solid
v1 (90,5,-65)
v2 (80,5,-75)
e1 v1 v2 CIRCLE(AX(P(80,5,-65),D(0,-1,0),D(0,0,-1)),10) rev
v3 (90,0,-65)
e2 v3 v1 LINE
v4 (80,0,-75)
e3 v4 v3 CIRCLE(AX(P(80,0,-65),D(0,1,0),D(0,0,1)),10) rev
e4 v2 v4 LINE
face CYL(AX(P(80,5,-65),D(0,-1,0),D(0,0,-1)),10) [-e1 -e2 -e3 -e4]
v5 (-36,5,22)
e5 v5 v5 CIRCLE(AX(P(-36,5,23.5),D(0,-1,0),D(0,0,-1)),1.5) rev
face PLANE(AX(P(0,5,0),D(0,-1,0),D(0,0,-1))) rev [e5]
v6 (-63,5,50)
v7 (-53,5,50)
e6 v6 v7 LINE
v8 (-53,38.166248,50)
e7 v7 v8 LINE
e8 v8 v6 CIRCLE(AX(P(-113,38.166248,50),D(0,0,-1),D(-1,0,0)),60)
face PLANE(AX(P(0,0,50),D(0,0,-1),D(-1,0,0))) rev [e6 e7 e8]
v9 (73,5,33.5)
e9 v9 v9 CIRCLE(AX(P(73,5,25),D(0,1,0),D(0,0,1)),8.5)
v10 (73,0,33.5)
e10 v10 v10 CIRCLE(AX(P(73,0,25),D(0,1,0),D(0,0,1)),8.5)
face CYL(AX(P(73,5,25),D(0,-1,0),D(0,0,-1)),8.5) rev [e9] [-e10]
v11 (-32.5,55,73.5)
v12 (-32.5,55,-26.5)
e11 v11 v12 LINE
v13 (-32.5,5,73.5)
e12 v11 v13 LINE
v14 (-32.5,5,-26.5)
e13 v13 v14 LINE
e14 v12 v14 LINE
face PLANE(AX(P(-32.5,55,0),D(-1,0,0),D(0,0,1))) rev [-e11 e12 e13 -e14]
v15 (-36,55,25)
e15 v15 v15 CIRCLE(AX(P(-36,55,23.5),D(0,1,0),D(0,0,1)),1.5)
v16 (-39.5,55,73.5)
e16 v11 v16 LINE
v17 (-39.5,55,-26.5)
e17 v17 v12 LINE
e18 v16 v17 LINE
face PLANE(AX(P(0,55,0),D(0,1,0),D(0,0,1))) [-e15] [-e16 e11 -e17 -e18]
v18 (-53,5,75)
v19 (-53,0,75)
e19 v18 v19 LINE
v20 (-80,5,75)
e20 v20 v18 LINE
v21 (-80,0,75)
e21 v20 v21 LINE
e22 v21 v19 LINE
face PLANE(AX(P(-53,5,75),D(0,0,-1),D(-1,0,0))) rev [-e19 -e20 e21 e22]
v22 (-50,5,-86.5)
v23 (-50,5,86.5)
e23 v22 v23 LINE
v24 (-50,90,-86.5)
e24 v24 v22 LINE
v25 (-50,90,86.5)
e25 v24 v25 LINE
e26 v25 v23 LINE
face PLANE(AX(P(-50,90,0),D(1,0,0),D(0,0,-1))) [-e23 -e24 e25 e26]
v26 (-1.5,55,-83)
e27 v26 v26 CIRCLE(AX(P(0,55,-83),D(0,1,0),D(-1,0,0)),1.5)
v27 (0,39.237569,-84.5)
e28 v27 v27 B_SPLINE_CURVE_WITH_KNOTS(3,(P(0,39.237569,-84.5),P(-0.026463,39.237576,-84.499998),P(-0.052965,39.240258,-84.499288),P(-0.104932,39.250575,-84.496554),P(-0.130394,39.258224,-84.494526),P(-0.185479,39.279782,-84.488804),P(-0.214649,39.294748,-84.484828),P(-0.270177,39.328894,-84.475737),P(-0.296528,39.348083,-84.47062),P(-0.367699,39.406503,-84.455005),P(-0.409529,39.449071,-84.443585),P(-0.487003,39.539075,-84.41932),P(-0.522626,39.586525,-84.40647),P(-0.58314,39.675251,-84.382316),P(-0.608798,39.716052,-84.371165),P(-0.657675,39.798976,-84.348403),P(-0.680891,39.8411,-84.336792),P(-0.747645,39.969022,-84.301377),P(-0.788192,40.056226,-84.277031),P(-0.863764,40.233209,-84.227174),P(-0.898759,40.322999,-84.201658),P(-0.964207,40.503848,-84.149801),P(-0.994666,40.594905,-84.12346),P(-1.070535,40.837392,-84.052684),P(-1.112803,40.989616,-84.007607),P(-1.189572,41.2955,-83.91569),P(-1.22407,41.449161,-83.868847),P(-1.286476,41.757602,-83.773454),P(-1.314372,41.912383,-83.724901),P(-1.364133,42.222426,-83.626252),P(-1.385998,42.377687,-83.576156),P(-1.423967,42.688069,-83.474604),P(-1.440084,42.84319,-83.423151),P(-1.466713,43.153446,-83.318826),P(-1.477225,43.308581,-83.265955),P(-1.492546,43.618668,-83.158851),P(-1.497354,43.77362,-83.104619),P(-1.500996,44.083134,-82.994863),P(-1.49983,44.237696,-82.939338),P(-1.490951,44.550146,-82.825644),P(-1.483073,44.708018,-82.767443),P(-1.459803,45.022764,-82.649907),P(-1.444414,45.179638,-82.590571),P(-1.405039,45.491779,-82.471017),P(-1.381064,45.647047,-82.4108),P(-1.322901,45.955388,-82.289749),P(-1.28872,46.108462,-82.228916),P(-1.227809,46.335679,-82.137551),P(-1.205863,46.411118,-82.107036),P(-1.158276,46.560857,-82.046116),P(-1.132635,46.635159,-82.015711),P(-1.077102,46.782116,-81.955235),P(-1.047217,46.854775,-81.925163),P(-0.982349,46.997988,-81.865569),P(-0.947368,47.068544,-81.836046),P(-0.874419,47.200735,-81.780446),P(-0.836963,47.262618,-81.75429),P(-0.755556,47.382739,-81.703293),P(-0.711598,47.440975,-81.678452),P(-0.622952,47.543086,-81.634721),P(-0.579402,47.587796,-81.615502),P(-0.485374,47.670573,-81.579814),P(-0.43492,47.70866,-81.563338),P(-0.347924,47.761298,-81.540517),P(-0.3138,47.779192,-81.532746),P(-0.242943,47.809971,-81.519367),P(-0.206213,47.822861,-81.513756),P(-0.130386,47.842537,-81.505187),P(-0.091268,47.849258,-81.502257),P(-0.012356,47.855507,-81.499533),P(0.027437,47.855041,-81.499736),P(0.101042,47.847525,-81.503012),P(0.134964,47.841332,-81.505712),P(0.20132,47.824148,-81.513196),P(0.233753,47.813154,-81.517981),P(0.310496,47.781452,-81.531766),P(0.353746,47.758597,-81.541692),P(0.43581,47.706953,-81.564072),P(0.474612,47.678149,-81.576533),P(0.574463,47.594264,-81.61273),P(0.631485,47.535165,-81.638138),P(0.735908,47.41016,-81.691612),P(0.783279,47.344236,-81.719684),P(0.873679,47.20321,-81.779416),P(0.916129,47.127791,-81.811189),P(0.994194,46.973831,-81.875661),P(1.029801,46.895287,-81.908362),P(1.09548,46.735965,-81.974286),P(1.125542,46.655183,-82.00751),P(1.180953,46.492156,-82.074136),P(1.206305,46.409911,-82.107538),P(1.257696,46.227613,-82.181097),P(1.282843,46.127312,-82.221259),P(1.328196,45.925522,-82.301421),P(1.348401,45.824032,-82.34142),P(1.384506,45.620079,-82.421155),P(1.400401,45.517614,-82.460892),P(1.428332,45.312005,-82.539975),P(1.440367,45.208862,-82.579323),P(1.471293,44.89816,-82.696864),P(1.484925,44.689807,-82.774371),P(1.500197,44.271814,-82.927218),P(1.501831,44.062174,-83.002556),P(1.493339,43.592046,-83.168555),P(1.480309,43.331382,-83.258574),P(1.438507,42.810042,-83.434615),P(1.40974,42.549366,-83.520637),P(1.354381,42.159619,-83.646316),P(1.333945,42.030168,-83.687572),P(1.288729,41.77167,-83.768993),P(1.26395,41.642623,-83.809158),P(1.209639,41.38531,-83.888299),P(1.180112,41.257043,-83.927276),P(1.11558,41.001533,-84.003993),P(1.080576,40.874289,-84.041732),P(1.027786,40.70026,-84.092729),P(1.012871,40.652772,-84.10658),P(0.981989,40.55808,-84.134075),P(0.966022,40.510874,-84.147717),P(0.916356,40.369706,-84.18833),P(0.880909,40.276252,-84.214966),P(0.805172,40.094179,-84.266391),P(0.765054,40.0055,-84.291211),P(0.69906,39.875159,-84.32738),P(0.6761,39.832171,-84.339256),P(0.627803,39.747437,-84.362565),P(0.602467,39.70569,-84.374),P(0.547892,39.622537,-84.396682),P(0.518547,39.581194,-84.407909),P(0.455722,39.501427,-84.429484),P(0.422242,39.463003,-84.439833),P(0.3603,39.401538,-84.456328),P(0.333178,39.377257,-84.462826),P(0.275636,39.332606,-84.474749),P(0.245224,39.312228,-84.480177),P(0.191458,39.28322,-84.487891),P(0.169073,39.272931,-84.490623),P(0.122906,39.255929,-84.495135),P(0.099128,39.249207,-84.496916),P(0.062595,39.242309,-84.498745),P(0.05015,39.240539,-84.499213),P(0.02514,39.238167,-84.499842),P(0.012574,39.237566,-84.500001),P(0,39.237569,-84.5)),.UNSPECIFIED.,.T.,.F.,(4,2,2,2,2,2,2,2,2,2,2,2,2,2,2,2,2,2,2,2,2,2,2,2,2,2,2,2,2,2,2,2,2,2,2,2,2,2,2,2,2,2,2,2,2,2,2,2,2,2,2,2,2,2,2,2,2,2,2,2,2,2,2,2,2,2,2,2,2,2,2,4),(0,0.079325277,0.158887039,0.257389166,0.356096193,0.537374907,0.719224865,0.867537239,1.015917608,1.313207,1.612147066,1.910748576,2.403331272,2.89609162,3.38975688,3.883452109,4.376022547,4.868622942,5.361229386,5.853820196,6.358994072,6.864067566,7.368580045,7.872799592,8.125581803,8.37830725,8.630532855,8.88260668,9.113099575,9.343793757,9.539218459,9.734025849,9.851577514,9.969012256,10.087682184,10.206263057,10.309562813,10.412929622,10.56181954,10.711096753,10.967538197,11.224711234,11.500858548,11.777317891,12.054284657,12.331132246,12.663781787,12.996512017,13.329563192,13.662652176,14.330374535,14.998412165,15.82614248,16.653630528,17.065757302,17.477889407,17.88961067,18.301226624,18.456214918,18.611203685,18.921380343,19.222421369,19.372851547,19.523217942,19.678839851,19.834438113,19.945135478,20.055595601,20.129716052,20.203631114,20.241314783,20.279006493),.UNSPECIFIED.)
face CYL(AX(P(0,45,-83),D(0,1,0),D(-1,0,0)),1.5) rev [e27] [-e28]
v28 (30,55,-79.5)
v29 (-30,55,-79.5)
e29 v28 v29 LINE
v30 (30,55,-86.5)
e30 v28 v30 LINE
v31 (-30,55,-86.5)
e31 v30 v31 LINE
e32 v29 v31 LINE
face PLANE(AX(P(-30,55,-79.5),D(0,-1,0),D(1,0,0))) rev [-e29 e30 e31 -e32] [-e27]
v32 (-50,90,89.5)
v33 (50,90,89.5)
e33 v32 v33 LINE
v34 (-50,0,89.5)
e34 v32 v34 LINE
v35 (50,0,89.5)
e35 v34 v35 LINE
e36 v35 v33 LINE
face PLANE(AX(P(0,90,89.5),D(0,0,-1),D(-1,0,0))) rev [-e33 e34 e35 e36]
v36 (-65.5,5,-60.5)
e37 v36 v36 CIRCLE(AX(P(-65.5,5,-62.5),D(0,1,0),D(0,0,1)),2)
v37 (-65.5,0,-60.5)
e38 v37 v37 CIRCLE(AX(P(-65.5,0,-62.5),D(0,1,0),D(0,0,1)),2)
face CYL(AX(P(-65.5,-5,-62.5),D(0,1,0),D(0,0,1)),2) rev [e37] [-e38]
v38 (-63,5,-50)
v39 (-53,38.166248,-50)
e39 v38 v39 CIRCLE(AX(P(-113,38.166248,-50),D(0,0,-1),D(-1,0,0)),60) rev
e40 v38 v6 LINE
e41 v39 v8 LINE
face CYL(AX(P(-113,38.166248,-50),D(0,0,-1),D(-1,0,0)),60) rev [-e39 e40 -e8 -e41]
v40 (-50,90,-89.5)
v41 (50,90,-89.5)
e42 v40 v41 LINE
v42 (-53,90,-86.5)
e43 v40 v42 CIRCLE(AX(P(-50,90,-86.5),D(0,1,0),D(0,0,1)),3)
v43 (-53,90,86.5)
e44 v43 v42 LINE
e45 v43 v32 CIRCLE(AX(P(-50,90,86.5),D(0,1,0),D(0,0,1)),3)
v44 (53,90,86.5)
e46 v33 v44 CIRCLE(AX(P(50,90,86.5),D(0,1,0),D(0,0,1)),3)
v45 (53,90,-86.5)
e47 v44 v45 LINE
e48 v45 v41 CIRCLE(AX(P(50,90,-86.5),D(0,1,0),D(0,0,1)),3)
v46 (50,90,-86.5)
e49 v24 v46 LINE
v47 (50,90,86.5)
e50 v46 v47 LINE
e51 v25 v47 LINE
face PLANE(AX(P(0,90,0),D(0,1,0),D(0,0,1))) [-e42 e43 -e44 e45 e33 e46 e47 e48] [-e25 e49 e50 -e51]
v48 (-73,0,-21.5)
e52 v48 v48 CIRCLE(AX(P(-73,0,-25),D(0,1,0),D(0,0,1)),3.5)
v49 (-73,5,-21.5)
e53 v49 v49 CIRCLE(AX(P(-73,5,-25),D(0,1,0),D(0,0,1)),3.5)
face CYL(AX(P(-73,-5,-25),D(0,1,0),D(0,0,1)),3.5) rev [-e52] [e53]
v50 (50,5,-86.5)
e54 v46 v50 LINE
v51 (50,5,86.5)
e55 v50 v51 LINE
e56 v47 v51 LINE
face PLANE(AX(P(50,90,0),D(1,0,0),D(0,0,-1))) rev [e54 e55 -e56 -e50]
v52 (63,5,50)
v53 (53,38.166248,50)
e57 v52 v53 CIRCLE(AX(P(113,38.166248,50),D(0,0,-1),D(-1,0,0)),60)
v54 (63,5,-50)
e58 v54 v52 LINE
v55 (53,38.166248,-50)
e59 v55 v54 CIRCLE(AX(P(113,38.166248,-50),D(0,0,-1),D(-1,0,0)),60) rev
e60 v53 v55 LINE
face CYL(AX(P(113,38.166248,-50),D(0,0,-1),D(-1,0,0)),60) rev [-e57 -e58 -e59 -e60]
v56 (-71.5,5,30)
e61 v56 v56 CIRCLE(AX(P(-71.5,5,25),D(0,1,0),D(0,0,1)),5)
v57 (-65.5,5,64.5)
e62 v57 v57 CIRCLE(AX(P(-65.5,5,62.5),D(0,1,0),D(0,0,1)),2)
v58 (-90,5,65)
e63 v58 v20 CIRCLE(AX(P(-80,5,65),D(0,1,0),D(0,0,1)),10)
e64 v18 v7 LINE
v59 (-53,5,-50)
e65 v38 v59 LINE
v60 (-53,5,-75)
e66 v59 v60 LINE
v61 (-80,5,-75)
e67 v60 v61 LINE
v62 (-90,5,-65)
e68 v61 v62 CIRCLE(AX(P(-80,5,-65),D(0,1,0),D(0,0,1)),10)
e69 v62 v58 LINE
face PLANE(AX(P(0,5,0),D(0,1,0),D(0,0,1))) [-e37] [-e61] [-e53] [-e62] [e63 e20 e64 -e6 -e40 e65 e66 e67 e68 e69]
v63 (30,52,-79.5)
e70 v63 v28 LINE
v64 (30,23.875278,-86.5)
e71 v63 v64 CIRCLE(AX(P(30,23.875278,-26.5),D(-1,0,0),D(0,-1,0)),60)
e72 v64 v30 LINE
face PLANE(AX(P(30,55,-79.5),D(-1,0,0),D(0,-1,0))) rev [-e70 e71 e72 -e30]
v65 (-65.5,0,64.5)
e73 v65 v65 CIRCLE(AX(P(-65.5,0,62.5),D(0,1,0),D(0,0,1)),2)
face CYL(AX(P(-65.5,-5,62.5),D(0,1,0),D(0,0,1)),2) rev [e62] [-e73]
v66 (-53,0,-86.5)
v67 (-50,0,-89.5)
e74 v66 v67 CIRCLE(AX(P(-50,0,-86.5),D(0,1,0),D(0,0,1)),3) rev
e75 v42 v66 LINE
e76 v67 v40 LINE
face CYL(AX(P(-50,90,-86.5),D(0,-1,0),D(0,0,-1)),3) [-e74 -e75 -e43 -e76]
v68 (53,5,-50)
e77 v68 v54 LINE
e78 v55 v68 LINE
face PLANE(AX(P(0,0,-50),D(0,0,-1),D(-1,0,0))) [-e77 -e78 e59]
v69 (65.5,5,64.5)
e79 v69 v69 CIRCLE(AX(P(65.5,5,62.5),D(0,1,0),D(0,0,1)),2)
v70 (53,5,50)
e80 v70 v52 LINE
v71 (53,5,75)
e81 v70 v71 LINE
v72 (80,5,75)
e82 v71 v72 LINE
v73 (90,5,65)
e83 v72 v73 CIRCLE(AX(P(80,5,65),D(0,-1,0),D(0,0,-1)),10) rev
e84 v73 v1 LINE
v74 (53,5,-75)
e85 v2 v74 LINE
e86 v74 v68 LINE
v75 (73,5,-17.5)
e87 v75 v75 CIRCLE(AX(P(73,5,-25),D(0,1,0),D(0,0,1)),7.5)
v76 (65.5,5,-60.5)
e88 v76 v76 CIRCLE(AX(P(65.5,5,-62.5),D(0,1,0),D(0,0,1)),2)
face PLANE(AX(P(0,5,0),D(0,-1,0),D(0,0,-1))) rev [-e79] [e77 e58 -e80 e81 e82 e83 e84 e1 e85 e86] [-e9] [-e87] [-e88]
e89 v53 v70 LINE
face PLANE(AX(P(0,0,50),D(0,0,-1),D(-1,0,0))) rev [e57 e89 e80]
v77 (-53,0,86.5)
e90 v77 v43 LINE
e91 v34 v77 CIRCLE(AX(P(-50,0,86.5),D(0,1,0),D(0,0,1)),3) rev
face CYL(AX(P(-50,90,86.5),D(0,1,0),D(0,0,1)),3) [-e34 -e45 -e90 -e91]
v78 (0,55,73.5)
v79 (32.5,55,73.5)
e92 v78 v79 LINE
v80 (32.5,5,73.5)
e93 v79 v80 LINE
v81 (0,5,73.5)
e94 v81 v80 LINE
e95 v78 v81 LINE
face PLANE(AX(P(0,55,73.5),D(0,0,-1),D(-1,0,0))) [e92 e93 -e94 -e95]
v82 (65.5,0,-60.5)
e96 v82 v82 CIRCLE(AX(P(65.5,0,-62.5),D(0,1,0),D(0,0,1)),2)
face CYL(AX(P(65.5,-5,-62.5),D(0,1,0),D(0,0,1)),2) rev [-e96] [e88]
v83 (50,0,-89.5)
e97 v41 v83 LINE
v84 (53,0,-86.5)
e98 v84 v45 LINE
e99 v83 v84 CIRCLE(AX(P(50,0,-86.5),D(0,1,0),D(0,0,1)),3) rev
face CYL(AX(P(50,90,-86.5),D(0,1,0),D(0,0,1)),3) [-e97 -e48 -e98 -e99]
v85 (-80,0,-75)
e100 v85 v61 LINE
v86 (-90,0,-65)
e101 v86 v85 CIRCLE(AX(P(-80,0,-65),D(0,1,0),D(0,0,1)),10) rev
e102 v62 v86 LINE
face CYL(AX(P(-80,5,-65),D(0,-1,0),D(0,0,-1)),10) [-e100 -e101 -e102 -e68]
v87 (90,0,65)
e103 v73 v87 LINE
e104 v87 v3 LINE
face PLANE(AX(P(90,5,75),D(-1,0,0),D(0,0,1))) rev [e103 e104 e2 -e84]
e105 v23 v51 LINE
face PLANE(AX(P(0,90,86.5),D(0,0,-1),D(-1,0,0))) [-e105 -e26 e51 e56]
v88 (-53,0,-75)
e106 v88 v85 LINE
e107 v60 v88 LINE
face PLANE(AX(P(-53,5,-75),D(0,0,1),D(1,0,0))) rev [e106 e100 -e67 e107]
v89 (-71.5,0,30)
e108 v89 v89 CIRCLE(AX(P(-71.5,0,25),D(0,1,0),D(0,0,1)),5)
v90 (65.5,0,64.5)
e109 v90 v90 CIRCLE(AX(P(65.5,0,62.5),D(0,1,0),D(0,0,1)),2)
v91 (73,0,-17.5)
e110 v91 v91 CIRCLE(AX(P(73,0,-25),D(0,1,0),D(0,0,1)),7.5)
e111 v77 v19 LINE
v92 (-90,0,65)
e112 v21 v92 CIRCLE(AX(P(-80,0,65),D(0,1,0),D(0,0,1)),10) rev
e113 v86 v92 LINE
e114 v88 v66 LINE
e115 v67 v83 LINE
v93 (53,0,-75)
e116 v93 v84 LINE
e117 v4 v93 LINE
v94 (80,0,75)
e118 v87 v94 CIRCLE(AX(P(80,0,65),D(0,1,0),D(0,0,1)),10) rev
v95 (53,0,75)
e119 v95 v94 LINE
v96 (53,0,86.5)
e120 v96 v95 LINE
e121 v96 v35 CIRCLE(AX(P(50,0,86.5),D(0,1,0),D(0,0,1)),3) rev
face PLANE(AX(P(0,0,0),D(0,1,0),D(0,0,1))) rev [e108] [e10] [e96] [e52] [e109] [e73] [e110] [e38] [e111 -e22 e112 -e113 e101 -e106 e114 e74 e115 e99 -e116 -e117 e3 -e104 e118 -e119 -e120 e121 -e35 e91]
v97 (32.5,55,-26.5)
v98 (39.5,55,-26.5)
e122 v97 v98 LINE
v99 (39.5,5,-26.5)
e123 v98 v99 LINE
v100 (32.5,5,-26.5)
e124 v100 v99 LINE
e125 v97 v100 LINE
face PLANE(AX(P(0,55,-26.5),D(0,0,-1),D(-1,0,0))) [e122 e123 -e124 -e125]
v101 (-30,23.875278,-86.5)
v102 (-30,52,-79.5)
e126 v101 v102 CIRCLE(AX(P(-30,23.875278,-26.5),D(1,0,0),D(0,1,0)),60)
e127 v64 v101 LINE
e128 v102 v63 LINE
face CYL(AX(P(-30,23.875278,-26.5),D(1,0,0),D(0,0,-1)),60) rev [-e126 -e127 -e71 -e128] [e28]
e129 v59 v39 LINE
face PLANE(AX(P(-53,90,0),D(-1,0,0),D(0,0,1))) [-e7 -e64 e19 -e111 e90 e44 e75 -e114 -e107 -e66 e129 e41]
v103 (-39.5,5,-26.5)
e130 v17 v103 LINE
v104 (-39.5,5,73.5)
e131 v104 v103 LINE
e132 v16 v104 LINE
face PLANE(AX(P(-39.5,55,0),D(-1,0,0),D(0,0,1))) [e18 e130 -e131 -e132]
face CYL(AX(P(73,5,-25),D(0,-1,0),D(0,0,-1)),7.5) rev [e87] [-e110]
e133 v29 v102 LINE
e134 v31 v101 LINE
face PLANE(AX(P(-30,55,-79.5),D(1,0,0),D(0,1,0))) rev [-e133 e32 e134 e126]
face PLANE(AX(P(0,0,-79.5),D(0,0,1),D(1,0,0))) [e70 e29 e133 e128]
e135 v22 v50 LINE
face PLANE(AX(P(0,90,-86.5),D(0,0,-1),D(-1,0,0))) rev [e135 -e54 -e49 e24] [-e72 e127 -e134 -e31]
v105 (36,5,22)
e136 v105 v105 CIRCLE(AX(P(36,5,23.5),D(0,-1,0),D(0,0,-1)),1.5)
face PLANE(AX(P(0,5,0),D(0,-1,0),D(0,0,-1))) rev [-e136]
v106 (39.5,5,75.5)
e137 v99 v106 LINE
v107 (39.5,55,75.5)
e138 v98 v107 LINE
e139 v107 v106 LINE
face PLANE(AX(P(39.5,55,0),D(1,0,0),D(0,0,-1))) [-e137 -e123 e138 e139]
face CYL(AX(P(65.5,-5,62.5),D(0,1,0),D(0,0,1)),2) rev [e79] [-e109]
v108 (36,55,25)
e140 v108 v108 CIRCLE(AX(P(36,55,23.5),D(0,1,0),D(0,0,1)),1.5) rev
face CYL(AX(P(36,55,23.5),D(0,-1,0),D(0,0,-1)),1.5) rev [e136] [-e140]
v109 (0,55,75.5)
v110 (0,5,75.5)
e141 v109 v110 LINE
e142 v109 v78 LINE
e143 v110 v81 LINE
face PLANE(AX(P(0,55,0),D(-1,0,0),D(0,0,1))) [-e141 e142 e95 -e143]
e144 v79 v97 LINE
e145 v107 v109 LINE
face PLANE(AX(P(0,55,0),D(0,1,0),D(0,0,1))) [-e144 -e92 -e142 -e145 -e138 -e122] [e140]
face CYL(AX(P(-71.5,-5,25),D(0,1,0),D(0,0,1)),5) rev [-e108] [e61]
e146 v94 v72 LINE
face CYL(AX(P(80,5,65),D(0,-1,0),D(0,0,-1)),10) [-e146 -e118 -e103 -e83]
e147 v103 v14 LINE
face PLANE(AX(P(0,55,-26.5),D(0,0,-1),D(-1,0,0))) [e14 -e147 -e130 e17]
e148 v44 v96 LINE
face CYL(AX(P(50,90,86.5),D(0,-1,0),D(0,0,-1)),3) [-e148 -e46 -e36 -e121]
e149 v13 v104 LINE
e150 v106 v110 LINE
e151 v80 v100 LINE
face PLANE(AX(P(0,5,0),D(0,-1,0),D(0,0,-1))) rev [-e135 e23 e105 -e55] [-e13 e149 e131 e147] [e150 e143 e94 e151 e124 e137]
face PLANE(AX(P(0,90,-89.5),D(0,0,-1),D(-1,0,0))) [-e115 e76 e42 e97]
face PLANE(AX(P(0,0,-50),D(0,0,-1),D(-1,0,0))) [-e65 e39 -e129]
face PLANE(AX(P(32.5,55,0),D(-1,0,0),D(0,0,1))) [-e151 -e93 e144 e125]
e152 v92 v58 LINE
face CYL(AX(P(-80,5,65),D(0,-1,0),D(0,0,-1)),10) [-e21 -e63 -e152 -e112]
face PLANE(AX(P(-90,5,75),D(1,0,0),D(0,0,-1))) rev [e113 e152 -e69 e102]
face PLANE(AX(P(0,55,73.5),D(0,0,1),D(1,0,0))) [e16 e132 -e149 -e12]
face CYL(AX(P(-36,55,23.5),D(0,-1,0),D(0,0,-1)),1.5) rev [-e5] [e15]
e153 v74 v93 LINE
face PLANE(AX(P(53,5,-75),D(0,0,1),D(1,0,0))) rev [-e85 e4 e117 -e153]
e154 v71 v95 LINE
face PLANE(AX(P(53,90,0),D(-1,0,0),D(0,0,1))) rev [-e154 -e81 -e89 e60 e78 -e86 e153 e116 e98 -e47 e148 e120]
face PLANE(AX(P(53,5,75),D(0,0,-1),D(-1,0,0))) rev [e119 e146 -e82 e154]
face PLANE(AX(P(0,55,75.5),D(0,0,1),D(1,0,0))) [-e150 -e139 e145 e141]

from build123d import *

# Parameters (mm, degrees)
CROQUIS1_W                    = 100
CROQUIS1_H                    = 173
CROQUIS1_R                    = 1.5
SALIENTE_EXTRUIR7_DEPTH       = 3
CROQUIS1_13_W                 = 100
CROQUIS1_13_H                 = 173
SALIENTE_EXTRUIR8_DEPTH       = 5
CROQUIS1_16_W                 = 106
CROQUIS1_16_H                 = 179
CROQUIS1_16_W_2               = 100
CROQUIS1_16_H_2               = 173
SALIENTE_EXTRUIR9_DEPTH       = 90
REDONDEO1_R                   = 3
CROQUIS4_W                    = 37
CROQUIS4_H                    = 150
CROQUIS4_R                    = 7.5
CROQUIS4_R_2                  = 8.5
SALIENTE_EXTRUIR10_DEPTH      = 5
SALIENTE_EXTRUIR11_DEPTH      = 50
SALIENTE_EXTRUIR11_DEPTH_BACK = 50
REDONDEO2_R                   = 10
CROQUIS1_17_R                 = 1.5
CROQUIS1_17_W                 = 7
CROQUIS1_17_H                 = 100
SALIENTE_EXTRUIR12_DEPTH      = 55
CROQUIS12_W                   = 60
CROQUIS12_H                   = 3
SALIENTE_EXTRUIR13_DEPTH      = 7
CROQUIS16_R                   = 1.5
CORTAR_EXTRUIR5_DEPTH         = 10
CROQUIS17_R                   = 2
CORTAR_EXTRUIR6_DEPTH         = 10
CROQUIS19_R                   = 3.5
CROQUIS19_R_2                 = 5
CORTAR_EXTRUIR7_DEPTH         = 10
REDONDEO3_R                   = 60
REDONDEO4_START               = -30
REDONDEO4_DEPTH               = 28.499998795
REDONDEO4_START_2             = 1.500002077
REDONDEO4_2_DEPTH             = 28.499997923
REDONDEO4_START_3             = -1.500001205
REDONDEO4_3_DEPTH             = 3.000003282
REDONDEO4_START_4             = 23.875277779
REDONDEO4_4_OUTLINE_R         = 1.5
REDONDEO4_4_DEPTH             = 28.124722221


with BuildPart() as part:
    # Croquis1 → Saliente-Extruir7 (new body)
    with BuildSketch(Plane(origin=(0, 0, 0), x_dir=(1, 0, 0), z_dir=(0, 1, 0))):
        Rectangle(CROQUIS1_W, CROQUIS1_H)
        with Locations(Location((-36, -23.5, 0), (0, 0, 270))):
            Circle(CROQUIS1_R, mode=Mode.SUBTRACT)
        with Locations(Location((36, -23.5, 0), (0, 0, 270))):
            Circle(CROQUIS1_R, mode=Mode.SUBTRACT)
    extrude(amount=SALIENTE_EXTRUIR7_DEPTH)

    # Croquis1<13> → Saliente-Extruir8 (add)
    with BuildSketch(Plane(origin=(0, 0, 0), x_dir=(1, 0, 0), z_dir=(0, 1, 0))):
        Rectangle(CROQUIS1_13_W, CROQUIS1_13_H)
    extrude(amount=SALIENTE_EXTRUIR8_DEPTH)

    # Croquis1<16> → Saliente-Extruir9 (add)
    with BuildSketch(Plane(origin=(0, 0, 0), x_dir=(1, 0, 0), z_dir=(0, 1, 0))):
        Rectangle(CROQUIS1_16_W, CROQUIS1_16_H)
        Rectangle(CROQUIS1_16_W_2, CROQUIS1_16_H_2, mode=Mode.SUBTRACT)
    extrude(amount=SALIENTE_EXTRUIR9_DEPTH)

    # Redondeo1
    redondeo1_edges = [part.edges().sort_by_distance(p)[0] for p in [
        (-53, 45, 89.5),
        (53, 45, 89.5),
        (53, 45, -89.5),
        (-53, 45, -89.5),
    ]]
    fillet(redondeo1_edges, radius=REDONDEO1_R)

    # Croquis4 → Saliente-Extruir10 (add)
    # profile 1 of 2: a face of its own
    with BuildSketch(Plane(origin=(0, 0, 0), x_dir=(1, 0, 0), z_dir=(0, 1, 0))):
        with Locations((-71.5, 0)):
            Rectangle(CROQUIS4_W, CROQUIS4_H)
    # profile 2 of 2: a face of its own
    with BuildSketch(Plane(origin=(0, 0, 0), x_dir=(1, 0, 0), z_dir=(0, 1, 0))):
        with Locations((71.5, 0)):
            Rectangle(CROQUIS4_W, CROQUIS4_H)
        with Locations(Location((73, 25, 0), (0, 0, 270))):
            Circle(CROQUIS4_R, mode=Mode.SUBTRACT)
        with Locations(Location((73, -25, 0), (0, 0, 270))):
            Circle(CROQUIS4_R_2, mode=Mode.SUBTRACT)
    extrude(amount=SALIENTE_EXTRUIR10_DEPTH)

    # Croquis5 → Saliente-Extruir11 (add, two sides: drawn at the far end of the back side and taken through both)
    with BuildSketch(Plane.XY.offset(-SALIENTE_EXTRUIR11_DEPTH_BACK)):
        Polygon((-53, 5), (-53, 20), (-63, 5), align=None)
        Polygon((53, 5), (53, 20), (63, 5), align=None)
    extrude(amount=SALIENTE_EXTRUIR11_DEPTH + SALIENTE_EXTRUIR11_DEPTH_BACK)

    # Redondeo2
    redondeo2_edges = [part.edges().sort_by_distance(p)[0] for p in [
        (90, 2.5, 75),
        (90, 2.5, -75),
        (-90, 2.5, -75),
        (-90, 2.5, 75),
    ]]
    fillet(redondeo2_edges, radius=REDONDEO2_R)

    # Croquis1<17> → Saliente-Extruir12 (add)
    # profile 1 of 2: a face of its own
    with BuildSketch(Plane(origin=(0, 0, 0), x_dir=(1, 0, 0), z_dir=(0, 1, 0))):
        Polygon((32.5, -73.5), (0, -73.5), (0, -75.5), (39.5, -75.5), (39.5, 26.5), (32.5, 26.5), align=None)
        with Locations(Location((36, -23.5, 0), (0, 0, 90))):
            Circle(CROQUIS1_17_R, mode=Mode.SUBTRACT)
    # profile 2 of 2: a face of its own
    with BuildSketch(Plane(origin=(0, 0, 0), x_dir=(1, 0, 0), z_dir=(0, 1, 0))):
        with Locations((-36, -23.5)):
            Rectangle(CROQUIS1_17_W, CROQUIS1_17_H)
        with Locations(Location((-36, -23.5, 0), (0, 0, 90))):
            Circle(CROQUIS1_17_R, mode=Mode.SUBTRACT)
    extrude(amount=SALIENTE_EXTRUIR12_DEPTH)

    # Croquis12 → Saliente-Extruir13 (add)
    with BuildSketch(Plane.XY.offset(-86.5)):
        with Locations((0, 53.5)):
            Rectangle(CROQUIS12_W, CROQUIS12_H)
    extrude(amount=SALIENTE_EXTRUIR13_DEPTH)

    # Croquis16 → Cortar-Extruir5 (cut)
    with BuildSketch(Plane(origin=(0, 55, 0), x_dir=(1, 0, 0), z_dir=(0, 1, 0))):
        with Locations(Location((0, 83, 0), (0, 0, 180))):
            Circle(CROQUIS16_R)
    extrude(amount=-CORTAR_EXTRUIR5_DEPTH, mode=Mode.SUBTRACT)

    # Croquis17 → Cortar-Extruir6 (cut)
    with BuildSketch(Plane(origin=(0, 5, 0), x_dir=(1, 0, 0), z_dir=(0, 1, 0))):
        with Locations(Location((-65.5, 62.5, 0), (0, 0, 270))):
            Circle(CROQUIS17_R)
        with Locations(Location((65.5, 62.5, 0), (0, 0, 270))):
            Circle(CROQUIS17_R)
        with Locations(Location((65.5, -62.5, 0), (0, 0, 270))):
            Circle(CROQUIS17_R)
        with Locations(Location((-65.5, -62.5, 0), (0, 0, 270))):
            Circle(CROQUIS17_R)
    extrude(amount=-CORTAR_EXTRUIR6_DEPTH, mode=Mode.SUBTRACT)

    # Croquis19 → Cortar-Extruir7 (cut)
    with BuildSketch(Plane(origin=(0, 5, 0), x_dir=(1, 0, 0), z_dir=(0, 1, 0))):
        with Locations(Location((-73, 25, 0), (0, 0, 270))):
            Circle(CROQUIS19_R)
        with Locations(Location((-71.5, -25, 0), (0, 0, 270))):
            Circle(CROQUIS19_R_2)
    extrude(amount=-CORTAR_EXTRUIR7_DEPTH, mode=Mode.SUBTRACT)

    # Redondeo3
    # the kernel refuses this fillet: 60 mm, written as the material it adds along each edge
    with BuildSketch(Plane(origin=(53, 20, 50), x_dir=(0, 1, 0), z_dir=(0, 0, -1)), Plane(origin=(-53, 20, -50), x_dir=(0, 1, 0), z_dir=(0, 0, 1))) as redondeo3_piece_1:
        with BuildLine():
            CenterArc((REDONDEO3_R * 0.302775637732, REDONDEO3_R), REDONDEO3_R, 236.309932474, 33.690067526)
            Line((-REDONDEO3_R * 0.251924558493, REDONDEO3_R * 0.167949705662), (0, 0))
            Line((0, 0), (REDONDEO3_R * 0.302775637732, 0))
        make_face()
    extrude(amount=100)

    # Redondeo4: read off the stored shape, not the designer's step
    # Redondeo4 outline → Redondeo4 (add)
    with BuildSketch(Plane.YZ.offset(REDONDEO4_START)):
        with BuildLine():
            ThreePointArc((52, -79.5), (38.366654525, -84.723706512), (23.875277779, -86.5))
            Line((23.875277779, -86.5), (52, -86.5))
            Line((52, -86.5), (52, -79.5))
        make_face()
    extrude(amount=REDONDEO4_DEPTH)

    # Redondeo4 2 outline → Redondeo4 2 (add)
    with BuildSketch(Plane.YZ.offset(REDONDEO4_START_2)):
        with BuildLine():
            ThreePointArc((52, -79.5), (38.366654525, -84.723706512), (23.875277779, -86.5))
            Line((23.875277779, -86.5), (52, -86.5))
            Line((52, -86.5), (52, -79.5))
        make_face()
    extrude(amount=REDONDEO4_2_DEPTH)

    # Redondeo4 3 outline → Redondeo4 3 (add)
    with BuildSketch(Plane.YZ.offset(REDONDEO4_START_3)):
        with BuildLine():
            ThreePointArc((52, -79.5), (38.366654525, -84.723706512), (23.875277779, -86.5))
            Line((23.875277779, -86.5), (52, -86.5))
            Line((52, -86.5), (52, -79.5))
        make_face()
    extrude(amount=REDONDEO4_3_DEPTH)

    # Redondeo4 4 outline → Redondeo4 4 (cut)
    with BuildSketch(Plane(origin=(0, 0, 0), x_dir=(1, 0, 0), z_dir=(0, 1, 0)).offset(REDONDEO4_START_4)):
        with Locations((0, 83)):
            Circle(REDONDEO4_4_OUTLINE_R)
    extrude(amount=REDONDEO4_4_DEPTH, mode=Mode.SUBTRACT)


solid = part.part
